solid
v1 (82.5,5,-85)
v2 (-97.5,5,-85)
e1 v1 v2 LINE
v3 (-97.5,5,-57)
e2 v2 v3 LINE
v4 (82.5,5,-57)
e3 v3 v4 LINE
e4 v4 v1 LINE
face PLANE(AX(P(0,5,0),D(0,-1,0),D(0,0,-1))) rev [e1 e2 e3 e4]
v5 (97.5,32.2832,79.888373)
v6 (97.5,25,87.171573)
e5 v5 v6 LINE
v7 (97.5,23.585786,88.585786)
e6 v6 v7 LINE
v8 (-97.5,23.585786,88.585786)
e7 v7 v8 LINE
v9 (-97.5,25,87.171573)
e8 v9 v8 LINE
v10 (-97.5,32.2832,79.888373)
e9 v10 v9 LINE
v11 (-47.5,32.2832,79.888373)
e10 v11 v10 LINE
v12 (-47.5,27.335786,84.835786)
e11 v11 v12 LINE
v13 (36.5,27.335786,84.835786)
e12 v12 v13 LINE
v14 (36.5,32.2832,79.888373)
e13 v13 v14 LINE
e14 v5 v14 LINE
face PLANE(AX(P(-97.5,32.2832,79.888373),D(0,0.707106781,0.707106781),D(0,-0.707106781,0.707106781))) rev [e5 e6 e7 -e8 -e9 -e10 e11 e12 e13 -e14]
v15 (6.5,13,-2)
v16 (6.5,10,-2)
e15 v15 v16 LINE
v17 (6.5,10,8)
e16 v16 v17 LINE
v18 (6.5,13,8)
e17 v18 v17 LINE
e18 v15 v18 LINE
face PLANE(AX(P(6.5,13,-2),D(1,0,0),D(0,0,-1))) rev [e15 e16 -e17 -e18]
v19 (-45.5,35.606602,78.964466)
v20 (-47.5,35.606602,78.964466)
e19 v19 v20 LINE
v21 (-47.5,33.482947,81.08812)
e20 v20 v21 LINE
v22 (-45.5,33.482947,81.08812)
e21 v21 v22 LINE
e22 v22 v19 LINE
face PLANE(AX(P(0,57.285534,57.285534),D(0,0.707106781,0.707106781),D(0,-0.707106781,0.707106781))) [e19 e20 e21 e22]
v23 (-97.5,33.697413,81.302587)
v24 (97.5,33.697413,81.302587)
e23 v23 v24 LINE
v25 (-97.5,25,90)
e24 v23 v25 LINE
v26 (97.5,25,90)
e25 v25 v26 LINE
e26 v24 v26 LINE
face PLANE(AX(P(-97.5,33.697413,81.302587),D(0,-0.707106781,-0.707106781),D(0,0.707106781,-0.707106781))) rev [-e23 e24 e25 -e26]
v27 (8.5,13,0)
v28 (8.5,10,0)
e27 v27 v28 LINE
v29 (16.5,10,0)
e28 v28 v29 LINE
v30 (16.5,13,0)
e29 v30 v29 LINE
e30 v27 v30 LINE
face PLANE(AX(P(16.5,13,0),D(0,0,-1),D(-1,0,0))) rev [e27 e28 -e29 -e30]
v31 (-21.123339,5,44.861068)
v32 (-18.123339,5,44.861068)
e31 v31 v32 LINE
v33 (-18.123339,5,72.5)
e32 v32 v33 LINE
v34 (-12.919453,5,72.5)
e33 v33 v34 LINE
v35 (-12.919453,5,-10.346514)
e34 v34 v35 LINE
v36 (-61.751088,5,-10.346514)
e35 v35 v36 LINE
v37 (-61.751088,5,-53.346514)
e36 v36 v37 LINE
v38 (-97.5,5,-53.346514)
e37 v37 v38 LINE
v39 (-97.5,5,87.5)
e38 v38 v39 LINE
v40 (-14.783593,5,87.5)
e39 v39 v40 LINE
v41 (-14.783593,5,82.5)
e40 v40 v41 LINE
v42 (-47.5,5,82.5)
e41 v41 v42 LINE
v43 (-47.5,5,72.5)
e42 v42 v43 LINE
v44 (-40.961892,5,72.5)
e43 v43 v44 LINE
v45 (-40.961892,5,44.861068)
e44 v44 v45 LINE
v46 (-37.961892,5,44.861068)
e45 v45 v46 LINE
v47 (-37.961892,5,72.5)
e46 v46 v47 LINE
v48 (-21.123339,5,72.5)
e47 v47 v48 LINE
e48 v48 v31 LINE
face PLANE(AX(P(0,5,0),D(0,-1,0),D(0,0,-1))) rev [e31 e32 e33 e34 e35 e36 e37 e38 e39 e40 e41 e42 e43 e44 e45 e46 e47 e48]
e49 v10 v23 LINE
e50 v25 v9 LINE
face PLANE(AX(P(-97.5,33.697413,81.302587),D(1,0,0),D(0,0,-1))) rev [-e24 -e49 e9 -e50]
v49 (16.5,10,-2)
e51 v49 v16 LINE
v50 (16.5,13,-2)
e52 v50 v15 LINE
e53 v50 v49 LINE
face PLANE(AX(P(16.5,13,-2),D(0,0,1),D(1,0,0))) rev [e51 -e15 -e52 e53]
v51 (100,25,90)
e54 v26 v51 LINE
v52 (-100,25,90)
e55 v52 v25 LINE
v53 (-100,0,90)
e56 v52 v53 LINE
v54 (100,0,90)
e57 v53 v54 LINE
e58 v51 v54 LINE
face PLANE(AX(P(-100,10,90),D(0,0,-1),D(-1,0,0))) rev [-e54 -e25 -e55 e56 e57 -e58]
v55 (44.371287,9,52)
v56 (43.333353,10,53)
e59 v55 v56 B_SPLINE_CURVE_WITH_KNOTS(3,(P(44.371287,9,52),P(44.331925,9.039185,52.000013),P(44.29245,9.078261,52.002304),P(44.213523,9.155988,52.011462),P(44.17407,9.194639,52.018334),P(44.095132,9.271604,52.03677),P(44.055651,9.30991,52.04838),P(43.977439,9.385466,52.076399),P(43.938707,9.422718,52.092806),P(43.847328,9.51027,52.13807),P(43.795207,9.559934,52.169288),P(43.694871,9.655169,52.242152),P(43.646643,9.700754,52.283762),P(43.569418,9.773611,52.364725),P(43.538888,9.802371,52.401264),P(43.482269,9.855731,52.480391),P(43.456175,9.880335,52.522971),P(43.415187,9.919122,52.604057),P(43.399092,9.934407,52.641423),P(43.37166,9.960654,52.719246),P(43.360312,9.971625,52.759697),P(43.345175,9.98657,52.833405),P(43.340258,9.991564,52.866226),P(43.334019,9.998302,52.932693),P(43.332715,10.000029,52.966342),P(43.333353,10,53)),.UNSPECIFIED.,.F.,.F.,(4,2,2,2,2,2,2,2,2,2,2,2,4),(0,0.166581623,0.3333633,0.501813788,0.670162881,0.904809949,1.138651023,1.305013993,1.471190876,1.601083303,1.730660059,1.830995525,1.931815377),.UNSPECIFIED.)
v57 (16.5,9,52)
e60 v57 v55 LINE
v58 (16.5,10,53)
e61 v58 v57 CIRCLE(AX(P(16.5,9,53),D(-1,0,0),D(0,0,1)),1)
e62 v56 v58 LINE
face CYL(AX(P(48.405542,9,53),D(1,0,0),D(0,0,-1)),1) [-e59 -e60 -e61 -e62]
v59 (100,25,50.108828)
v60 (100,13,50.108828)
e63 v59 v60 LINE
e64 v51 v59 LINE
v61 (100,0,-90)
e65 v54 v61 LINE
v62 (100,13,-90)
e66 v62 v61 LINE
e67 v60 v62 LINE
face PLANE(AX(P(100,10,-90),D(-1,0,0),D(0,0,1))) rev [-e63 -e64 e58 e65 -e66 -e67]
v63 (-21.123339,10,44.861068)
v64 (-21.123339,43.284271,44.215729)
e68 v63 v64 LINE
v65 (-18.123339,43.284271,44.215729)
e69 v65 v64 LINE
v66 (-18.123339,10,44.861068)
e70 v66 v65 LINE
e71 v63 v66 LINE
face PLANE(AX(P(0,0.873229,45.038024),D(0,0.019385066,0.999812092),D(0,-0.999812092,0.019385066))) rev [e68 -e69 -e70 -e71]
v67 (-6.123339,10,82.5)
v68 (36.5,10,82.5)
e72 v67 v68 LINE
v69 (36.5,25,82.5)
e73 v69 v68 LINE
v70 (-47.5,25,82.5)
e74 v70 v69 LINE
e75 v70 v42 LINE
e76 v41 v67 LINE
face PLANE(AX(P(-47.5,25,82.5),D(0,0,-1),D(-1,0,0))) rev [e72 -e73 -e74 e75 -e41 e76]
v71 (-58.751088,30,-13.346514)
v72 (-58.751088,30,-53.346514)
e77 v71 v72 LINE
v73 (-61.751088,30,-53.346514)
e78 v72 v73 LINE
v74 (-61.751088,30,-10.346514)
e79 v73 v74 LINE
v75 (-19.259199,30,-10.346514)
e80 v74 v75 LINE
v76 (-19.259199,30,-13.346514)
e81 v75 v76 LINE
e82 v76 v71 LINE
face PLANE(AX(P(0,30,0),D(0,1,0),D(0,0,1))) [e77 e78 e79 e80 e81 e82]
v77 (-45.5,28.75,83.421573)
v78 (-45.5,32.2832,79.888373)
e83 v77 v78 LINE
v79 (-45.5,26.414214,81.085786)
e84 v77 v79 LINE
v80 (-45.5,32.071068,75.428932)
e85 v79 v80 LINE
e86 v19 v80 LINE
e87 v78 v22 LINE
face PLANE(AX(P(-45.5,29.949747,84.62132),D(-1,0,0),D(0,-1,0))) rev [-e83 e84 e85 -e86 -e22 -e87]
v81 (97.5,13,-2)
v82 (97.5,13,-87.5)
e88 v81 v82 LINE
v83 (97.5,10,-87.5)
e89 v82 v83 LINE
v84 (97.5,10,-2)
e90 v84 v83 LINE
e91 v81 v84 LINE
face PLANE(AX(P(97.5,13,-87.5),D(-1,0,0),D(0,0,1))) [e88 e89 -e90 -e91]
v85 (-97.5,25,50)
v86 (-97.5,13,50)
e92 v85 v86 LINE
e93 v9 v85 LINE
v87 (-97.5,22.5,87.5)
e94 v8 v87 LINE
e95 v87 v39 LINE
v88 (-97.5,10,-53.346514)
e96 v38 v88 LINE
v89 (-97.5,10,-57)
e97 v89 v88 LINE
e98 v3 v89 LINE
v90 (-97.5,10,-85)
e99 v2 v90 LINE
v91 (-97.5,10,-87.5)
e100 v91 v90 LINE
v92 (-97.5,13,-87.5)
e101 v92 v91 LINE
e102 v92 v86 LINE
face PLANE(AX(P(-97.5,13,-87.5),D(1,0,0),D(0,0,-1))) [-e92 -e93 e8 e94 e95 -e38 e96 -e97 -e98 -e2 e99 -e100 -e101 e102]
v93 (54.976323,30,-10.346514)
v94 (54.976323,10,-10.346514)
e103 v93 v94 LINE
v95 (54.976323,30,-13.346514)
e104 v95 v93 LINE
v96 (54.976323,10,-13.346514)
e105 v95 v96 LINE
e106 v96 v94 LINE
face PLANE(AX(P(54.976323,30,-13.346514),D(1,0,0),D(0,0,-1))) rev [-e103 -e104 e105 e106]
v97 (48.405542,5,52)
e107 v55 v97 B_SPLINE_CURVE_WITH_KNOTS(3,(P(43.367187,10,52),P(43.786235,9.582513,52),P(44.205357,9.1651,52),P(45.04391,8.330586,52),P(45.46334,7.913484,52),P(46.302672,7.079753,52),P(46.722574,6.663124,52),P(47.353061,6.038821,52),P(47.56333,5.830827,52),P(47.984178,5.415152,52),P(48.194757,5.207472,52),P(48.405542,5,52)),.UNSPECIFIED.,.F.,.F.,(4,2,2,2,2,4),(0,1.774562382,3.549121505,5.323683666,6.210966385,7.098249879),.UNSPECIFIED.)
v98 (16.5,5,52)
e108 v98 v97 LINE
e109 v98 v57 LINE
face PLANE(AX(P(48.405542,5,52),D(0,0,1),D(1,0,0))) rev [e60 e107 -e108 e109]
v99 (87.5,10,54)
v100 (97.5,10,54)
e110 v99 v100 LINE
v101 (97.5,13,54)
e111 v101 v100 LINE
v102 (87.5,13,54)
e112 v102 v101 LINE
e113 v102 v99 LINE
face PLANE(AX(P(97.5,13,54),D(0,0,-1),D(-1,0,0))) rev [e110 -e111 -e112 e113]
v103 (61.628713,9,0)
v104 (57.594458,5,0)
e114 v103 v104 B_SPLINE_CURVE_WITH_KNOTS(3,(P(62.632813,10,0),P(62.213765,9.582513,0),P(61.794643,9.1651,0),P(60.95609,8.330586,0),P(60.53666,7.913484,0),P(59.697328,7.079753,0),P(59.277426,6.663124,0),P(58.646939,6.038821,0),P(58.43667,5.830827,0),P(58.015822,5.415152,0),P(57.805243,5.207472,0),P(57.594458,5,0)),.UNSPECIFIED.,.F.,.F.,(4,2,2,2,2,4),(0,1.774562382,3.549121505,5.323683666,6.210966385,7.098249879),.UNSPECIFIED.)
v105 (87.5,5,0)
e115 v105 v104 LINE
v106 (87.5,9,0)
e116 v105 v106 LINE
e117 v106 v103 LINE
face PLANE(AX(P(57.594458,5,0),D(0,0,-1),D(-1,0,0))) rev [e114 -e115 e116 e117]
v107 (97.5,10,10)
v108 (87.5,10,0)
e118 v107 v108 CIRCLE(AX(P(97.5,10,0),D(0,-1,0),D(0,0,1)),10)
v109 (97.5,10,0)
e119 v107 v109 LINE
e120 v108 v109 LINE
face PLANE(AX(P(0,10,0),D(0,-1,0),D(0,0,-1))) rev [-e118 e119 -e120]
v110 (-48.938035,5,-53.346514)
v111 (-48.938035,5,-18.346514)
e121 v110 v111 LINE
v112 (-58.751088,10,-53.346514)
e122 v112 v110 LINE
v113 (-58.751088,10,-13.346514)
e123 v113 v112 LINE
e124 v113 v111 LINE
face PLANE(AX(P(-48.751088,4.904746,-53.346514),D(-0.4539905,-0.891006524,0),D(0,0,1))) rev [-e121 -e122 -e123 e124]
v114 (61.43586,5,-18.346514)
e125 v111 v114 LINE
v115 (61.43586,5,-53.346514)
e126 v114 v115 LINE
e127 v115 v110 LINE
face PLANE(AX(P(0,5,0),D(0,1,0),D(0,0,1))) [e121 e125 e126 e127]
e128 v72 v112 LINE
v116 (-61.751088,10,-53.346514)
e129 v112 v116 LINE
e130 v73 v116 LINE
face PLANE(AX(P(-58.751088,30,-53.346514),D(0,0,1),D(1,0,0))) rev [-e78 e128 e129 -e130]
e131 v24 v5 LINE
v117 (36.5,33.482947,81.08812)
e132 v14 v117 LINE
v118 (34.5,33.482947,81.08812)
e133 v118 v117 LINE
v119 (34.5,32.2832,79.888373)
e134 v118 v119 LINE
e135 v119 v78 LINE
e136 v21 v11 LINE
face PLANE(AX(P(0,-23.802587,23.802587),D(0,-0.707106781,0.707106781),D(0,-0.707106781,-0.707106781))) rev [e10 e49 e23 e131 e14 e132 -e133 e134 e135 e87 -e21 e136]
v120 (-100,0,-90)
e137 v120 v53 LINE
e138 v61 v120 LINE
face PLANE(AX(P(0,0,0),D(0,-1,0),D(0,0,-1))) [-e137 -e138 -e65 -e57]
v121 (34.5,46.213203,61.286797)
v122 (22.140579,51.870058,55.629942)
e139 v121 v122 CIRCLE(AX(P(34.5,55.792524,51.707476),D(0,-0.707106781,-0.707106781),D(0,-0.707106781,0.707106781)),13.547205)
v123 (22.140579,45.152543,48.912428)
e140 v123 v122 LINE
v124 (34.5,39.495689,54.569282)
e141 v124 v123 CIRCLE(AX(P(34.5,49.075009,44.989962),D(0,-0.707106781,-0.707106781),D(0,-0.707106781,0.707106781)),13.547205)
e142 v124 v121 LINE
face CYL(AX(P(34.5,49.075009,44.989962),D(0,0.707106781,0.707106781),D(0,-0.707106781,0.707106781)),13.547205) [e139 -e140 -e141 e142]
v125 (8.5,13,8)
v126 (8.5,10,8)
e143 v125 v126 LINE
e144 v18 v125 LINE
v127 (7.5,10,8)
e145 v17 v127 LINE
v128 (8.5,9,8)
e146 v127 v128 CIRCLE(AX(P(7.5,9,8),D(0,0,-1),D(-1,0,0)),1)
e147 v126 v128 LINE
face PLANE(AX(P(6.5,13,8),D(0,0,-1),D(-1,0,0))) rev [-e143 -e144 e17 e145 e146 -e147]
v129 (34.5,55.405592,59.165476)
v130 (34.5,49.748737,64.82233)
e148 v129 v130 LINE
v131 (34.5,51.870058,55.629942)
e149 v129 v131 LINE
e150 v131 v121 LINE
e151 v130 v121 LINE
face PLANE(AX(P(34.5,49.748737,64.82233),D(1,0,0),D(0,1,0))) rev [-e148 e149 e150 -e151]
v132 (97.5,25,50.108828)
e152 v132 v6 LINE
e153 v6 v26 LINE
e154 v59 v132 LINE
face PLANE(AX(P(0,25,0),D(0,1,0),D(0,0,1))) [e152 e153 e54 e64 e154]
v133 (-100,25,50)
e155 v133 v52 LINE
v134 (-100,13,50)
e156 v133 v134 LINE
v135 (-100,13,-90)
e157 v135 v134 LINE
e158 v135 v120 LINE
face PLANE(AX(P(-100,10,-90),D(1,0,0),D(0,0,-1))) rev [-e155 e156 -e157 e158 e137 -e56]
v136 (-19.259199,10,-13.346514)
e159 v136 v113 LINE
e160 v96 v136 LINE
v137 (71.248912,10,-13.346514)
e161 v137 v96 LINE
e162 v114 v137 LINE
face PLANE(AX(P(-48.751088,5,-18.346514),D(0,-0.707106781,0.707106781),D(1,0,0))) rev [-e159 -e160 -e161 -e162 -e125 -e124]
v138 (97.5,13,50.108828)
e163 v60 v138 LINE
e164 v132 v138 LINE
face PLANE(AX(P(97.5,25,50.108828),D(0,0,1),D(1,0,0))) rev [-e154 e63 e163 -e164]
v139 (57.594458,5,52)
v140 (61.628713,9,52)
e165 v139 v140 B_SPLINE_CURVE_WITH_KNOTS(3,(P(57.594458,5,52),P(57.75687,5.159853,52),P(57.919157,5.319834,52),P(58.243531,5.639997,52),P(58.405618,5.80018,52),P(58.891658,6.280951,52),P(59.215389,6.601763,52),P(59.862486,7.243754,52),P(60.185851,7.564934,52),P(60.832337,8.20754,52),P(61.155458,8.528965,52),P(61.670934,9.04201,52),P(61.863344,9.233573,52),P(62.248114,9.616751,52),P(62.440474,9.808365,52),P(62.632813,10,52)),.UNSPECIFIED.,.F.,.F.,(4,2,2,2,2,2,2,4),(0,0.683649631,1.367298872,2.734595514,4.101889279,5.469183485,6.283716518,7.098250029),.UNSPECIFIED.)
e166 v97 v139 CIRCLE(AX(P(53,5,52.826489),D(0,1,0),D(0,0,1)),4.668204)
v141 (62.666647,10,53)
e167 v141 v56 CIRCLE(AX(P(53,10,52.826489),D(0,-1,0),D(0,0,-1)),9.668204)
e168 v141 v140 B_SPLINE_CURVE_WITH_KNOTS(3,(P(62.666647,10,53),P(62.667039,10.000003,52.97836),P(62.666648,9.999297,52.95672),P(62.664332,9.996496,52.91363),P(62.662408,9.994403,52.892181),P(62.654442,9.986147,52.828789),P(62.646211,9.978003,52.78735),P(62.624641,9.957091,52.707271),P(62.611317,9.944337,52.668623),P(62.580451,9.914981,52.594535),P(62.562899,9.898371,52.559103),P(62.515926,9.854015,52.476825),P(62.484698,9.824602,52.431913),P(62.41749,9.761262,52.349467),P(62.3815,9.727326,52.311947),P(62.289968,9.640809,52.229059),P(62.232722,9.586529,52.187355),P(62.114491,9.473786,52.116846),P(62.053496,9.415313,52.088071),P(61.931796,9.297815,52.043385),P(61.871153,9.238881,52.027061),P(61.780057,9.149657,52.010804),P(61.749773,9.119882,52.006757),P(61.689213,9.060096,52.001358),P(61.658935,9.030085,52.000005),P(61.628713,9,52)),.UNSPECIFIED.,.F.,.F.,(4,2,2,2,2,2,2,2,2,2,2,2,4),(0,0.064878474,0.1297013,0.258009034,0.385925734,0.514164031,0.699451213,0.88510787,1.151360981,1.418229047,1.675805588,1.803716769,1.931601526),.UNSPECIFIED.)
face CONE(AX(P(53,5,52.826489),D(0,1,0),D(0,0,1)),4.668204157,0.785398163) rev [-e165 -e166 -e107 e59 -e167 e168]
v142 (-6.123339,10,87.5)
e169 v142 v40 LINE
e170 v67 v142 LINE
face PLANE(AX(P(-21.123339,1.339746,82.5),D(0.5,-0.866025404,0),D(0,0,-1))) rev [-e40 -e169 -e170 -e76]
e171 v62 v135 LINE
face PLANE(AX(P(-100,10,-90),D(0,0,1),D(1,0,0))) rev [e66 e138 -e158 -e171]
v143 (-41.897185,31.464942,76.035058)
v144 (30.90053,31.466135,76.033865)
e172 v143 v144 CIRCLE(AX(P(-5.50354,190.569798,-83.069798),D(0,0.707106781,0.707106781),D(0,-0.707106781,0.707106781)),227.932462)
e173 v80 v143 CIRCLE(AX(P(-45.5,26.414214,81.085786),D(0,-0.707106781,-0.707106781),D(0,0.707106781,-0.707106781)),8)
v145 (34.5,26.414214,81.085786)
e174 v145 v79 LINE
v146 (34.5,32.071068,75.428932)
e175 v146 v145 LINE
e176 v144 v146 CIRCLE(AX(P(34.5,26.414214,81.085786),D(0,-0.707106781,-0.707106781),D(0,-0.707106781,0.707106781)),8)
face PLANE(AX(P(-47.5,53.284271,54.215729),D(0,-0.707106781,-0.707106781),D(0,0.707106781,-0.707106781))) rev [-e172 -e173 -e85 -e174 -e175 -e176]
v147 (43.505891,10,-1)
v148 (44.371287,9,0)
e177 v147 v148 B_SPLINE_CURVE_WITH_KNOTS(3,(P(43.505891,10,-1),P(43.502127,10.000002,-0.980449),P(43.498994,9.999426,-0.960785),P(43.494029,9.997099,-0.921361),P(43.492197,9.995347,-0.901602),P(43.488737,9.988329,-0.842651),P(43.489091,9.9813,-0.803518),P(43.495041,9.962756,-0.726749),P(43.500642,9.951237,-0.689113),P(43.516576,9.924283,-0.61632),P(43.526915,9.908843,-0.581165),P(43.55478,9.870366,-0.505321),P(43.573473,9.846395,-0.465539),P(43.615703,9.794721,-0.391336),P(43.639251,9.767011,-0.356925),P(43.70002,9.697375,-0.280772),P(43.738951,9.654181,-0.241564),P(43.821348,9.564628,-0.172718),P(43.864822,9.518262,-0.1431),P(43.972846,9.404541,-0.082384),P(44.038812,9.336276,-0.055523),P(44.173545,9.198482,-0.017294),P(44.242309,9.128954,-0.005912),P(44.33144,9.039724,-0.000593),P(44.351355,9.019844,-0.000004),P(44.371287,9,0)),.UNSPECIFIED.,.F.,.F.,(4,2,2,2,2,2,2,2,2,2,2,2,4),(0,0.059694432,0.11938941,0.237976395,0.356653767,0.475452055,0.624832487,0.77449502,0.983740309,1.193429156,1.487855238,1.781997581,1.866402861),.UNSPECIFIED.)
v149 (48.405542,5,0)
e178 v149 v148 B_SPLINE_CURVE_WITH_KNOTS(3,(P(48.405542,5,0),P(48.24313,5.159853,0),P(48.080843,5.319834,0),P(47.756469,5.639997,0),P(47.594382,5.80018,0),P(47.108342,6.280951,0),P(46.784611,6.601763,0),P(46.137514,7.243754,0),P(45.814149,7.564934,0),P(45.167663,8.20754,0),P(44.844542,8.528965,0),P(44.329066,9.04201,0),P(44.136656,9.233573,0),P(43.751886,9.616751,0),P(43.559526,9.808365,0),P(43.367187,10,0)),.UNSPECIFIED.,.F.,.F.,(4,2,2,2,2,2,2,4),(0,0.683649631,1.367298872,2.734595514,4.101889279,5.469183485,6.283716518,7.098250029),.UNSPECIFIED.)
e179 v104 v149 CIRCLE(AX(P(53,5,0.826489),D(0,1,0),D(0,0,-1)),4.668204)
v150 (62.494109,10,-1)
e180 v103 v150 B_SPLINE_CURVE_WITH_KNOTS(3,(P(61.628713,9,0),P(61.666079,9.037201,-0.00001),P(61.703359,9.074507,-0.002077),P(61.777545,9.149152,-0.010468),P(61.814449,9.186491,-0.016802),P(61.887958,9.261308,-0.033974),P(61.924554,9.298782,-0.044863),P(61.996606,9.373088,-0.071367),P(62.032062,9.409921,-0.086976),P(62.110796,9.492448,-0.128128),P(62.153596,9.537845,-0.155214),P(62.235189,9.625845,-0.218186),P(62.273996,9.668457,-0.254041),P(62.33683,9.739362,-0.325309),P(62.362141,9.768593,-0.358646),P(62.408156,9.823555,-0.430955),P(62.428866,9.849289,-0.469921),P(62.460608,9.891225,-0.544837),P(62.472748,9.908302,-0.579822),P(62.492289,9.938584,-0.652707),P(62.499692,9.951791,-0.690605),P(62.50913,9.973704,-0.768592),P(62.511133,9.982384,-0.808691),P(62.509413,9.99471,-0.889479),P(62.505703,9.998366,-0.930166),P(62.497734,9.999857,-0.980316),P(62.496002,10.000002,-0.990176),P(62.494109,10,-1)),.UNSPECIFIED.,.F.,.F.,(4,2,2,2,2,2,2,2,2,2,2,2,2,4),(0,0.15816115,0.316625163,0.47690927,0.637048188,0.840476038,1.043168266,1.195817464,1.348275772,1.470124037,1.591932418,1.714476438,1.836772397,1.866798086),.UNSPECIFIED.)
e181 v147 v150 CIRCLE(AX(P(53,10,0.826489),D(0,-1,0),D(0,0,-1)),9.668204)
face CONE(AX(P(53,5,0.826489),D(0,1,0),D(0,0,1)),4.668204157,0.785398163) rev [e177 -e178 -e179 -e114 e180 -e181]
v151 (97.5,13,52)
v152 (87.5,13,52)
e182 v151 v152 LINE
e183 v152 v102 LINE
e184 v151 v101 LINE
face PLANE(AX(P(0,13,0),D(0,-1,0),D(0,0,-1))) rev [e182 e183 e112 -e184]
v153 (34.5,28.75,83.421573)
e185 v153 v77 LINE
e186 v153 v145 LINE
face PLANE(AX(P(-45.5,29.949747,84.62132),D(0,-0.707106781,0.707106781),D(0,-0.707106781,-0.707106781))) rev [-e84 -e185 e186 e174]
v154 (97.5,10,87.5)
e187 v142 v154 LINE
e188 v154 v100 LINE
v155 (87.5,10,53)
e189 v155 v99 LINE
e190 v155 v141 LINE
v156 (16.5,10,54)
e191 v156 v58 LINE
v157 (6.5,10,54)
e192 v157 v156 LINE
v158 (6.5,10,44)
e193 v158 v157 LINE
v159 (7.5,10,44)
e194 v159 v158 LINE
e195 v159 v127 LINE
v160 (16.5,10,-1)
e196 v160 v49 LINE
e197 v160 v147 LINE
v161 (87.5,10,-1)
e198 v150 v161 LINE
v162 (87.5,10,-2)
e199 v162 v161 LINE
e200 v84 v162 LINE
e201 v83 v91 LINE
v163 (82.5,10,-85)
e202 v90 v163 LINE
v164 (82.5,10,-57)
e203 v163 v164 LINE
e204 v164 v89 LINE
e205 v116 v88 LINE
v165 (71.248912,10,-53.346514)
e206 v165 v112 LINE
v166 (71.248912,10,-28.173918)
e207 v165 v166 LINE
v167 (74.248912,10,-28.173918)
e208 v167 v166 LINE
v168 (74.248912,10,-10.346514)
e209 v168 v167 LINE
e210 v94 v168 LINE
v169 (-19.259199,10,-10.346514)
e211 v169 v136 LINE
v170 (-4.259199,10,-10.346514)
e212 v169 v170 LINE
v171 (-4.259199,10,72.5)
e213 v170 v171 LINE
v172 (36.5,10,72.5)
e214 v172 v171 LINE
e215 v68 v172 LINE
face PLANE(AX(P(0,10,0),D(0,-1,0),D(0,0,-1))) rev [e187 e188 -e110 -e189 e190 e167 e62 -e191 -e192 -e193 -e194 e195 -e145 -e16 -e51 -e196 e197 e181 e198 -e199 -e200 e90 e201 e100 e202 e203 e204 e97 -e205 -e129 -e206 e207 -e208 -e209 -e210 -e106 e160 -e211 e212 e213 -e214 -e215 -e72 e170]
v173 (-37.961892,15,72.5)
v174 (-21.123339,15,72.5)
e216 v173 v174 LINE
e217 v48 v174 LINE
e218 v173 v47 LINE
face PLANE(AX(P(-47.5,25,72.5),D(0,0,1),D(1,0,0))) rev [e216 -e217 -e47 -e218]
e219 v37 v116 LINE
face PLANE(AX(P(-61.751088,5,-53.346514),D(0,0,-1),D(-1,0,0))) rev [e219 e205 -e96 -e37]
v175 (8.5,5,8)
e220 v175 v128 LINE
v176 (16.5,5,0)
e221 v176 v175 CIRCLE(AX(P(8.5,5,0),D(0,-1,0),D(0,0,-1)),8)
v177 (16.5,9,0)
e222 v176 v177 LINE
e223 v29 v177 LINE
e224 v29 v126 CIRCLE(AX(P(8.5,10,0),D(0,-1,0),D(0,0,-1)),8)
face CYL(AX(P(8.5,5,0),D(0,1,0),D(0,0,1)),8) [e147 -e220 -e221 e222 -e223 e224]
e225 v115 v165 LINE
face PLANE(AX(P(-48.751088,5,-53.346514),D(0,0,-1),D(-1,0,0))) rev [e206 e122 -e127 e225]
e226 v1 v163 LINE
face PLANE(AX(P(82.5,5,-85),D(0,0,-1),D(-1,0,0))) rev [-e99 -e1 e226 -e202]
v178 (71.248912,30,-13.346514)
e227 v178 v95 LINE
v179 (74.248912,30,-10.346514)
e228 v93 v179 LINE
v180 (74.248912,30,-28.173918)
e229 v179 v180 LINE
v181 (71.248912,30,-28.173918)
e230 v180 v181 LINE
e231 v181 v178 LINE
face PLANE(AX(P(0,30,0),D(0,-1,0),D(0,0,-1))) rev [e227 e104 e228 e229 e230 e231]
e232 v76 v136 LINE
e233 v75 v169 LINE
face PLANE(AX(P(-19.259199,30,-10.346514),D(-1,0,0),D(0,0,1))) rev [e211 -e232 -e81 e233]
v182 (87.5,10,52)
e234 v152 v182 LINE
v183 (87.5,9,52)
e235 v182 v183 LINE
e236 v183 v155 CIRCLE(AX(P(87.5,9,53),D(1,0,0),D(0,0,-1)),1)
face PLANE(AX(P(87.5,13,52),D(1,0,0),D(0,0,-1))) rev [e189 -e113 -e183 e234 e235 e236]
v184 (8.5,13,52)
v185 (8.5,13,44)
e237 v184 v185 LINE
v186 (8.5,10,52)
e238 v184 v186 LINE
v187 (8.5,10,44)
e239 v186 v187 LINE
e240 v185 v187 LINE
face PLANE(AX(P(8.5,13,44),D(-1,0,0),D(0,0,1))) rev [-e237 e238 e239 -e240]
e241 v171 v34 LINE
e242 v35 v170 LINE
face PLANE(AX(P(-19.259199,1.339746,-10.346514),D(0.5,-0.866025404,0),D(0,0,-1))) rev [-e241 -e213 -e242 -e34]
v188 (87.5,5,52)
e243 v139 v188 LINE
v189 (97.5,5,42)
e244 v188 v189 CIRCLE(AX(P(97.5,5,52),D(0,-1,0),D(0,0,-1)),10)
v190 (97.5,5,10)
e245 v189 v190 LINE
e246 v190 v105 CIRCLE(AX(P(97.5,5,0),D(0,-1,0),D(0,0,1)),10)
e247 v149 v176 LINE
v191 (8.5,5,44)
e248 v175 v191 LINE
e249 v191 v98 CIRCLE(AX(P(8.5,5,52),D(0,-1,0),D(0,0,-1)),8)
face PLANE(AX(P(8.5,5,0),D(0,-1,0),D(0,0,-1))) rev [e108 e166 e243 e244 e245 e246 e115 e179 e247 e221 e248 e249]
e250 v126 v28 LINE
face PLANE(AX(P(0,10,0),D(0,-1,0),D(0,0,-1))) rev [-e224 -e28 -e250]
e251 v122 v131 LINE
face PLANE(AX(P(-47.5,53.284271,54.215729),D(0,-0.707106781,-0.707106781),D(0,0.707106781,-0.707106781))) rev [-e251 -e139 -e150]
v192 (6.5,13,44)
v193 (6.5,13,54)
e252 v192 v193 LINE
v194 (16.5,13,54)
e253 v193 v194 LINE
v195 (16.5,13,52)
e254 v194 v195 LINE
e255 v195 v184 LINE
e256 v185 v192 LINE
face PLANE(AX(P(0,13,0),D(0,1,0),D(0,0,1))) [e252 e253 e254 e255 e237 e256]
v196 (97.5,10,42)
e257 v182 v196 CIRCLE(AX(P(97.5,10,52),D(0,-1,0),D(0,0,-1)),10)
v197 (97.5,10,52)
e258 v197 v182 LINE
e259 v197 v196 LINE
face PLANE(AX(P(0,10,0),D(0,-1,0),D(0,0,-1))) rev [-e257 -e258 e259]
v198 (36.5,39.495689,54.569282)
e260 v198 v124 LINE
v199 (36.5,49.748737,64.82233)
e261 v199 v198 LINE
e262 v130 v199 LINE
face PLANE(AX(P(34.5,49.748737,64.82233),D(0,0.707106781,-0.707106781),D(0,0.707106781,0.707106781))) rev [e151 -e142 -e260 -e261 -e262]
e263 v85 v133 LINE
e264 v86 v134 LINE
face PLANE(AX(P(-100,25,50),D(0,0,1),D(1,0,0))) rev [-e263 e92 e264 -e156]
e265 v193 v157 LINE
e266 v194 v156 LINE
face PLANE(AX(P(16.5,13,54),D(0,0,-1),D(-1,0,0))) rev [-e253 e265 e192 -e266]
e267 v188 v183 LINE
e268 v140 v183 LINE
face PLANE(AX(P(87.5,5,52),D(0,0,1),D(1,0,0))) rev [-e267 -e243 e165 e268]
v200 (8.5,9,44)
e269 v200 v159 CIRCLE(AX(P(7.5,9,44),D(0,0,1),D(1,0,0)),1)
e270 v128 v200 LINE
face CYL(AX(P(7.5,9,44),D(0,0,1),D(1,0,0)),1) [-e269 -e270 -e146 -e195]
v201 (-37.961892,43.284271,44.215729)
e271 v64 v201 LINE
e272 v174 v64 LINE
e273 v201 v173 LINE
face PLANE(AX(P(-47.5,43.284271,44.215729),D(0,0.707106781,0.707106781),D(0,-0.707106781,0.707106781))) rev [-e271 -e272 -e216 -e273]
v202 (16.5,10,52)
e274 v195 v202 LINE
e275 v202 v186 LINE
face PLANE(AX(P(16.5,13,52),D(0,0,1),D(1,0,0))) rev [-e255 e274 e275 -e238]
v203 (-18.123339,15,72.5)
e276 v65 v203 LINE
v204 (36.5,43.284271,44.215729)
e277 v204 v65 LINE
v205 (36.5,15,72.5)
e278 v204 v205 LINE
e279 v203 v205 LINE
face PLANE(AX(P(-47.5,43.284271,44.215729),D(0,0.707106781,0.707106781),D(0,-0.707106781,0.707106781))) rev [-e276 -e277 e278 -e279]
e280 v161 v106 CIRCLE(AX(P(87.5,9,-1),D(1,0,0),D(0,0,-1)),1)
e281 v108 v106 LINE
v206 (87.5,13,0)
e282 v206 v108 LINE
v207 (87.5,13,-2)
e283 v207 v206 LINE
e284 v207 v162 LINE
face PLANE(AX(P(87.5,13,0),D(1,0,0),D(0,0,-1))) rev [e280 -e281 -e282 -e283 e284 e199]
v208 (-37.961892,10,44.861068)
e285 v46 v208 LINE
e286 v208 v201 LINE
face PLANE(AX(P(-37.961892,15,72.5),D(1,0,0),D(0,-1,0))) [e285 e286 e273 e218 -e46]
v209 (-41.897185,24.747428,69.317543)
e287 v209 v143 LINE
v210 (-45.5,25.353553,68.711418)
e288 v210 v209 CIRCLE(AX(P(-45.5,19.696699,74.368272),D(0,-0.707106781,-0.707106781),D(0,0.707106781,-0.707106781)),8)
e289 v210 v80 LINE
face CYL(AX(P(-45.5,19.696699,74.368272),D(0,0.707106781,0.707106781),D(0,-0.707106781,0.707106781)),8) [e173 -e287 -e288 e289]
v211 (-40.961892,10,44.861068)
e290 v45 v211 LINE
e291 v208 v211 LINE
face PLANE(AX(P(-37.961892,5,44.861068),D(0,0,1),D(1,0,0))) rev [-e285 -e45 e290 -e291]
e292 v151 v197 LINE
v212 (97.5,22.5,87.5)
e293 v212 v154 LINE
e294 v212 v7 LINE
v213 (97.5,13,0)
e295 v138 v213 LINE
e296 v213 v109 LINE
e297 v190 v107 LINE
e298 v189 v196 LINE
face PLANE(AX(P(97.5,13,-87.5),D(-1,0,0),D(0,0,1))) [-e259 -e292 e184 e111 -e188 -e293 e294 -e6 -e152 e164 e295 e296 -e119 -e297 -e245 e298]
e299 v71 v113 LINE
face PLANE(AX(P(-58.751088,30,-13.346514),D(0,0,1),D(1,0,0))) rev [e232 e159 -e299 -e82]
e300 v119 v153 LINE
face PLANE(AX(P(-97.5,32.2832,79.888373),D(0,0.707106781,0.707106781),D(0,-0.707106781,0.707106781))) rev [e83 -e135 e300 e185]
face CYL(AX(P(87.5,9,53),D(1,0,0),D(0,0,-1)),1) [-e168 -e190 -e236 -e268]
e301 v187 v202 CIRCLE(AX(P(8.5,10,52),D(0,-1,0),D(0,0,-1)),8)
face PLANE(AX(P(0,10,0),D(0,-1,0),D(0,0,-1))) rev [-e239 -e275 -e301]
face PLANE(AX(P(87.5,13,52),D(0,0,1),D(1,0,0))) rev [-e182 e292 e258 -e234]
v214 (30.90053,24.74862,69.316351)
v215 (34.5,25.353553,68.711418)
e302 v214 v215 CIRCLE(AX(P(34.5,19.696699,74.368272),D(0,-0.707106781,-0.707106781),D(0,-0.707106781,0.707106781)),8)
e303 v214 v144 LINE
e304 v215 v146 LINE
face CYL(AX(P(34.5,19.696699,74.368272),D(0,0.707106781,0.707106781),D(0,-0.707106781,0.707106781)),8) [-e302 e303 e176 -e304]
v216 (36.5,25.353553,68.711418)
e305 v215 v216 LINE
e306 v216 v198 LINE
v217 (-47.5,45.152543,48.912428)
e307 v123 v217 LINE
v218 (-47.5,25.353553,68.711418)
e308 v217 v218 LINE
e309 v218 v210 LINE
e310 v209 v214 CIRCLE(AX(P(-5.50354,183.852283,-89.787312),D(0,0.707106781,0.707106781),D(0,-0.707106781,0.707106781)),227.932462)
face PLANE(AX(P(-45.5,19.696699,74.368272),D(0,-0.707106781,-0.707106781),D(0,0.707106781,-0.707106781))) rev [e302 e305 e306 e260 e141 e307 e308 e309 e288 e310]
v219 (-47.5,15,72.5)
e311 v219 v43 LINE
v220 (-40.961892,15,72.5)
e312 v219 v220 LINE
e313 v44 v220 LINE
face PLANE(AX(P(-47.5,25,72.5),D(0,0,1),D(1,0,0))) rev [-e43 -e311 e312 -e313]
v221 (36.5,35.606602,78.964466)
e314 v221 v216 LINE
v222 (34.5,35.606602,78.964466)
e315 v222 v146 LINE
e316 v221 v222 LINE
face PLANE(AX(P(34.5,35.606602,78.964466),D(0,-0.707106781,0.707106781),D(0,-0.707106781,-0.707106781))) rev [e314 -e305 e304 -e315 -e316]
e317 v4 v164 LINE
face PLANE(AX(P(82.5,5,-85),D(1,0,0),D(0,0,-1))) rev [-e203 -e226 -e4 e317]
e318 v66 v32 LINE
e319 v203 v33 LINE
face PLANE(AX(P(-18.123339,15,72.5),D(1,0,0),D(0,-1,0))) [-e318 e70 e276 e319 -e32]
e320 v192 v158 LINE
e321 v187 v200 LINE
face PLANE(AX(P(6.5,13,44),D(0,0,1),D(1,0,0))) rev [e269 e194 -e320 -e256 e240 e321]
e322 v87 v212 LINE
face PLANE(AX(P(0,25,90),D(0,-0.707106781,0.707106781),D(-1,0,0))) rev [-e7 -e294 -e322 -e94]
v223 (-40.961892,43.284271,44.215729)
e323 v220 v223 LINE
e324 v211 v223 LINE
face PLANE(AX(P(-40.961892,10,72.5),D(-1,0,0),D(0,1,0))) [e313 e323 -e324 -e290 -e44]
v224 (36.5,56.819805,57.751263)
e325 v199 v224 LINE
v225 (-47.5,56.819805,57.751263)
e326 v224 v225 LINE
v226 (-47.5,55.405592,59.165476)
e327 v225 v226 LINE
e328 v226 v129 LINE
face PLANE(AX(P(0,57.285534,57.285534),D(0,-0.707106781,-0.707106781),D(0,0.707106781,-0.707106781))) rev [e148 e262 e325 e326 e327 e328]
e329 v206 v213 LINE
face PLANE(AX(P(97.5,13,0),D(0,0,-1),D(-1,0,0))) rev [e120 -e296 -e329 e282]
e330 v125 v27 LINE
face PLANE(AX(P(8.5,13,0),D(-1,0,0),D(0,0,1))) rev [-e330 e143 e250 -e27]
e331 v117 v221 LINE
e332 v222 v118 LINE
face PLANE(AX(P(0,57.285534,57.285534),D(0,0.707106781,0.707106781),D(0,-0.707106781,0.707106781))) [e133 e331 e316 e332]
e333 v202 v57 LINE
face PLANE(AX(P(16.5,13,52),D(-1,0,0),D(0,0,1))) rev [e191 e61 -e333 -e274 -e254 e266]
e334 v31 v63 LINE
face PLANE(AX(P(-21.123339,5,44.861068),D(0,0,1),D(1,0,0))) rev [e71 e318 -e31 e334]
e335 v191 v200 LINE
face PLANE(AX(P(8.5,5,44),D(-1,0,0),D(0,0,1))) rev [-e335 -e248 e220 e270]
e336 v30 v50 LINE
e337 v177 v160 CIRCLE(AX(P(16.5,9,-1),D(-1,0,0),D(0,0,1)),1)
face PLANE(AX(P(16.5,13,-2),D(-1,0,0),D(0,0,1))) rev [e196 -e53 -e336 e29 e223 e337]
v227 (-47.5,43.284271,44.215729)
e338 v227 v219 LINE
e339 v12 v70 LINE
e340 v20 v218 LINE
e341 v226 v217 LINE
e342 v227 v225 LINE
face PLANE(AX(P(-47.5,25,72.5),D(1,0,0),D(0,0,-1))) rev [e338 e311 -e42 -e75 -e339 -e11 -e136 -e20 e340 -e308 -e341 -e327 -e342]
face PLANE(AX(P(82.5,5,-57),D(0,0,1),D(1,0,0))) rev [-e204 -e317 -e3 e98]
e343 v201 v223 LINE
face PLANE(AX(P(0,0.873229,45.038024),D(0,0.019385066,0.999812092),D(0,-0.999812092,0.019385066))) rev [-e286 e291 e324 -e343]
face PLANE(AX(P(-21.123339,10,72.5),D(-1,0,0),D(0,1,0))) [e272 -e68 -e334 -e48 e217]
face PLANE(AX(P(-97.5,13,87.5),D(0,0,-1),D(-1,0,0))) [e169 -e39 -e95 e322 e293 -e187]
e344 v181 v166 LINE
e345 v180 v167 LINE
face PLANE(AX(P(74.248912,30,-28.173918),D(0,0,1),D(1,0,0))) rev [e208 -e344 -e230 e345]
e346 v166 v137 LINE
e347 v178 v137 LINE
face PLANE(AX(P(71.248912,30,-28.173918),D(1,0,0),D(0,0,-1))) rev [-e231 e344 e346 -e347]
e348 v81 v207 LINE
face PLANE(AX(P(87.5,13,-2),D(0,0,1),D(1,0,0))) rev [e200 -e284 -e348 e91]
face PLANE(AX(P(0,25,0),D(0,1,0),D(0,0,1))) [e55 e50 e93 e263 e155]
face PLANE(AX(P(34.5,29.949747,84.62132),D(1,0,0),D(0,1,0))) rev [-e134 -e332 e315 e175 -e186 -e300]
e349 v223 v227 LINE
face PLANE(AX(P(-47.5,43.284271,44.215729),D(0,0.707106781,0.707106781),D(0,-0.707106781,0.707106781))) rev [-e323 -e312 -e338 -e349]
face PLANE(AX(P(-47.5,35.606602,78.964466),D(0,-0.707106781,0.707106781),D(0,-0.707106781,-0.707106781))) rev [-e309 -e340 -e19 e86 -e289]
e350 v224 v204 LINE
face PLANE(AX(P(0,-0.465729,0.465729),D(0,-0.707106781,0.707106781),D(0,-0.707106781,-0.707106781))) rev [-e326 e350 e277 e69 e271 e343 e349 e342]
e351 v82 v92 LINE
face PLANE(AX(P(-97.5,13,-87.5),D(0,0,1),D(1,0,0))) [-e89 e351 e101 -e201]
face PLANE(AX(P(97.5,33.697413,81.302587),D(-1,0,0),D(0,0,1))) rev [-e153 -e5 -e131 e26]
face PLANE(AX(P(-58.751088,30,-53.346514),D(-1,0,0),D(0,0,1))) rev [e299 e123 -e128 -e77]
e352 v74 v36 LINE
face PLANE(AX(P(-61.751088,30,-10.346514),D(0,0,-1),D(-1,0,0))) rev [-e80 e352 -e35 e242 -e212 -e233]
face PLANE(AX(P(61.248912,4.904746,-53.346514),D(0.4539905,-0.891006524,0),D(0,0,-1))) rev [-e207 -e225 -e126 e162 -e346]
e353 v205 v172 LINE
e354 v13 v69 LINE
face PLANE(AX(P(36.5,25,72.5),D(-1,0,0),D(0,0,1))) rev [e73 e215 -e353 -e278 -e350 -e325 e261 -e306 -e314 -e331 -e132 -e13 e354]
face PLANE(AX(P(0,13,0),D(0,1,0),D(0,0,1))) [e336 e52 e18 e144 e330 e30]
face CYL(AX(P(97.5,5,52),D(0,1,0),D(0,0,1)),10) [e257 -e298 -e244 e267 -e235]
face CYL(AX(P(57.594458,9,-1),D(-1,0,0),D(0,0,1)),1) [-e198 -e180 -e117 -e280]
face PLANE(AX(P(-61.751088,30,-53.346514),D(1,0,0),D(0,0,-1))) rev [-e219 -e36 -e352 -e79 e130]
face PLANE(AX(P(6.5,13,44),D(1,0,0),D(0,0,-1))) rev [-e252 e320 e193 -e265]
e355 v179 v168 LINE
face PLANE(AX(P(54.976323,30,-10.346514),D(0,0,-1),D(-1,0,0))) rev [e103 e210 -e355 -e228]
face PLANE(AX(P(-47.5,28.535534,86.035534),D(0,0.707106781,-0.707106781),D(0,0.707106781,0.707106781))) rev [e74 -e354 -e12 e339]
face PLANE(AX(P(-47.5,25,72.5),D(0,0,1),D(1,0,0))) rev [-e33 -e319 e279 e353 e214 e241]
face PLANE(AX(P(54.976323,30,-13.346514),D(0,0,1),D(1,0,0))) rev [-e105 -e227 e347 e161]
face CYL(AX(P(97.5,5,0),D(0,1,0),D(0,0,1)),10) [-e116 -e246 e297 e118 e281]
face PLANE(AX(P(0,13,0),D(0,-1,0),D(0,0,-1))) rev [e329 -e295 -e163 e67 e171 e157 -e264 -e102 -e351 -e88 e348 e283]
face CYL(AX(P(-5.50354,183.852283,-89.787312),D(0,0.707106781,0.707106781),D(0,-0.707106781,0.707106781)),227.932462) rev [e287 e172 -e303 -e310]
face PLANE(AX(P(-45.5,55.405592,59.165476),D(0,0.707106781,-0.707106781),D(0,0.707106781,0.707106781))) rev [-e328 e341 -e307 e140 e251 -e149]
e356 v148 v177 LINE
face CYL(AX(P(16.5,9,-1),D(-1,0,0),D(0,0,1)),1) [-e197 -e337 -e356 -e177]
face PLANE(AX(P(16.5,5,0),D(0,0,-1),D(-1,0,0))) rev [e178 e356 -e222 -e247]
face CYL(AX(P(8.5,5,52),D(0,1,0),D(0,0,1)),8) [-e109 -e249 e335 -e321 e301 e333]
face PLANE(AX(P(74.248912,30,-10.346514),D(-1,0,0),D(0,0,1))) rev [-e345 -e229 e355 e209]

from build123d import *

# Parameters (mm, degrees)
SKETCH1_W            = 200
SKETCH1_H            = 180
BOSS_EXTRUDE1_DEPTH  = 10
SKETCH2_W            = 200
SKETCH2_H            = 180
SKETCH2_W_2          = 195
SKETCH2_H_2          = 175
BOSS_EXTRUDE2_DEPTH  = 3
SKETCH11_W           = 180
SKETCH11_H           = 28
CUT_EXTRUDE4_DEPTH   = 8
BOSS_EXTRUDE6_DEPTH  = 20
SKETCH4_W            = 10
SKETCH4_H            = 2
BOSS_EXTRUDE3_DEPTH  = 3
CUT_EXTRUDE1_DEPTH   = 5
CHAMFER1_SIZE        = 5
FILLET1_R            = 1
SKETCH7_W            = 84
SKETCH7_H            = 10
BOSS_EXTRUDE4_DEPTH  = 15
CHAMFER2_SIZE        = 10
SKETCH8_W            = 84
SKETCH8_H            = 14.142135624
BOSS_EXTRUDE5_DEPTH  = 40
BOSS_EXTRUDE12_DEPTH = 5
CUT_EXTRUDE5_DEPTH   = 9.5
LOFT2_START          = -40.961892057
LOFT2_DEPTH          = 3
LOFT3_START          = 61.722133944
LOFT3_OUTLINE_W      = 3
LOFT3_OUTLINE_H      = 43.678858874
LOFT3_DEPTH          = 4.277866056
LOFT5_START          = -40.961892057
LOFT5_DEPTH          = 3
LOFT6_START          = -21.123339187
LOFT6_DEPTH          = 3
SKETCH32_W           = 110
SKETCH32_H           = 35
CUT_EXTRUDE6_DEPTH   = 5
CHAMFER6_START       = -10.346513917
CHAMFER6_DEPTH       = 82.846513917
CHAMFER6_2_OUTLINE_W = 1.135860263
CHAMFER6_2_OUTLINE_H = 5
CHAMFER6_2_DEPTH     = 55.207581741
CHAMFER6_START_2     = 82.5
CHAMFER6_3_DEPTH     = 5
CHAMFER8_SIZE        = 5
BOSS_EXTRUDE13_DEPTH = 12
CHAMFER5_SIZE        = 2.5
SKETCH25_W           = 195
SKETCH25_H           = 2
BOSS_EXTRUDE14_DEPTH = 12.3
BOSS_EXTRUDE15_DEPTH = 10


with BuildPart() as part:
    # Sketch1 → Boss-Extrude1 (new body)
    with BuildSketch(Plane(origin=(0, 0, 0), x_dir=(1, 0, 0), z_dir=(0, 1, 0))):
        Rectangle(SKETCH1_W, SKETCH1_H)
    extrude(amount=BOSS_EXTRUDE1_DEPTH)

    # Sketch2 → Boss-Extrude2 (add)
    with BuildSketch(Plane(origin=(0, 10, 0), x_dir=(1, 0, 0), z_dir=(0, 1, 0))):
        Rectangle(SKETCH2_W, SKETCH2_H)
        Rectangle(SKETCH2_W_2, SKETCH2_H_2, mode=Mode.SUBTRACT)
    extrude(amount=BOSS_EXTRUDE2_DEPTH)

    # Sketch11 → Cut-Extrude4 (cut)
    with BuildSketch(Plane(origin=(0, 13, 0), x_dir=(1, 0, 0), z_dir=(0, 1, 0))):
        with Locations((-7.5, 71)):
            Rectangle(SKETCH11_W, SKETCH11_H)
    extrude(amount=-CUT_EXTRUDE4_DEPTH, mode=Mode.SUBTRACT)

    # Sketch12 → Boss-Extrude6 (add)
    with BuildSketch(Plane(origin=(0, 10, 0), x_dir=(1, 0, 0), z_dir=(0, 1, 0))):
        Polygon((-58.75108786, 53.346513917), (-58.75108786, 13.346513917), (-19.25919945, 13.346513917), (-19.25919945, 10.346513917), (-61.75108786, 10.346513917), (-61.75108786, 53.346513917), align=None)
        Polygon((71.24891214, 28.173917959), (71.24891214, 13.346513917), (54.976322897, 13.346513917), (54.976322897, 10.346513917), (74.24891214, 10.346513917), (74.24891214, 28.173917959), align=None)
    extrude(amount=BOSS_EXTRUDE6_DEPTH)

    # Sketch4 → Boss-Extrude3 (add)
    with BuildSketch(Plane(origin=(0, 10, 0), x_dir=(1, 0, 0), z_dir=(0, 1, 0))):
        Polygon((8.5, 0), (8.5, -8), (6.5, -8), (6.5, 2), (16.5, 2), (16.5, 0), align=None)
        Polygon((16.5, -52), (16.5, -54), (6.5, -54), (6.5, -44), (8.5, -44), (8.5, -52), align=None)
        with Locations((92.5, 1)):
            Rectangle(SKETCH4_W, SKETCH4_H)
        with Locations((92.5, -53)):
            Rectangle(SKETCH4_W, SKETCH4_H)
    extrude(amount=BOSS_EXTRUDE3_DEPTH)

    # Sketch5 → Cut-Extrude1 (cut)
    with BuildSketch(Plane(origin=(0, 10, 0), x_dir=(1, 0, 0), z_dir=(0, 1, 0))):
        with BuildLine():
            Line((16.5, 0), (48.405541733, 0))
            ThreePointArc((48.405541733, 0), (53, 3.841715626), (57.594458267, 0))
            Line((57.594458267, 0), (87.5, 0))
            ThreePointArc((87.5, 0), (90.428932188, -7.071067812), (97.5, -10))
            Line((97.5, -10), (97.5, -42))
            ThreePointArc((97.5, -42), (90.428932188, -44.928932188), (87.5, -52))
            Line((87.5, -52), (57.594458267, -52))
            ThreePointArc((57.594458267, -52), (53, -57.494692689), (48.405541733, -52))
            Line((48.405541733, -52), (16.5, -52))
            ThreePointArc((16.5, -52), (14.156854249, -46.343145751), (8.5, -44))
            Line((8.5, -44), (8.5, -8))
            ThreePointArc((8.5, -8), (14.156854249, -5.656854249), (16.5, 0))
        make_face()
    extrude(amount=-CUT_EXTRUDE1_DEPTH, mode=Mode.SUBTRACT)

    # Chamfer1
    chamfer1_edges = [part.edges().sort_by_distance(p)[0] for p in [
        (53, 10, -3.841715626),
        (53, 10, 57.494692689),
    ]]
    chamfer(chamfer1_edges, length=CHAMFER1_SIZE - 0.0001)  # a hair under: the kernel refuses the full size

    # Fillet1
    # the kernel refuses this fillet: 1 mm, written as the material it takes off along each edge
    with BuildSketch(Plane(origin=(8.5, 10, 44), x_dir=(-1, 0, 0), z_dir=(0, 0, -1))) as fillet1_piece_1:
        with BuildLine():
            CenterArc((FILLET1_R, -FILLET1_R), FILLET1_R, 90, 90)
            Line((0, -FILLET1_R), (0, 0))
            Line((0, 0), (FILLET1_R, 0))
        make_face()
    extrude(amount=36, mode=Mode.SUBTRACT)
    with BuildSketch(Plane(origin=(45.867287261, 10, 52), x_dir=(0, 0, 1), z_dir=(-1, 0, 0)), Plane(origin=(16.5, 10, 0), x_dir=(0, 0, -1), z_dir=(1, 0, 0))) as fillet1_piece_2:
        with BuildLine():
            CenterArc((FILLET1_R, -FILLET1_R), FILLET1_R, 90, 90)
            Line((0, -FILLET1_R), (0, 0))
            Line((0, 0), (FILLET1_R, 0))
        make_face()
    extrude(amount=29.367287261, mode=Mode.SUBTRACT)
    with BuildSketch(Plane(origin=(87.5, 10, 52), x_dir=(0, 0, 1), z_dir=(-1, 0, 0)), Plane(origin=(60.132712739, 10, 0), x_dir=(0, 0, -1), z_dir=(1, 0, 0))) as fillet1_piece_3:
        with BuildLine():
            CenterArc((FILLET1_R, -FILLET1_R), FILLET1_R, 90, 90)
            Line((0, -FILLET1_R), (0, 0))
            Line((0, 0), (FILLET1_R, 0))
        make_face()
    extrude(amount=27.367287261, mode=Mode.SUBTRACT)

    # Sketch7 → Boss-Extrude4 (add)
    with BuildSketch(Plane(origin=(0, 10, 0), x_dir=(1, 0, 0), z_dir=(0, 1, 0))):
        with Locations((-5.5, -77.5)):
            Rectangle(SKETCH7_W, SKETCH7_H)
    extrude(amount=BOSS_EXTRUDE4_DEPTH)

    # Chamfer2
    chamfer2_edges = [part.edges().sort_by_distance(p)[0] for p in [
        (-5.5, 25, 72.5),
    ]]
    chamfer(chamfer2_edges, length=CHAMFER2_SIZE - 0.0001)  # a hair under: the kernel refuses the full size

    # Sketch8 → Boss-Extrude5 (add)
    with BuildSketch(Plane(origin=(0, -28.75, 28.75), x_dir=(1, 0, 0), z_dir=(0, 0.7071067811865446, -0.7071067811865506))):
        with Locations((-5.5, -68.942911166)):
            Rectangle(SKETCH8_W, SKETCH8_H)
    extrude(amount=BOSS_EXTRUDE5_DEPTH)

    # Sketch22 → Boss-Extrude12 (add)
    with BuildSketch(Plane(origin=(0, 53.75, 53.75), x_dir=(1, 0, 0), z_dir=(0, 0.7071067811865507, 0.7071067811865446))):
        Polygon((-47.5, -0.658639918), (-47.5, -2.658639918), (-45.5, -2.658639918), (34.5, -2.658639918), (34.5, -10.658639918), (36.5, -10.658639918), (36.5, -0.658639918), align=None)
        Polygon((-47.5, -40.658639918), (36.5, -40.658639918), (36.5, -30.658639918), (34.5, -30.658639918), (34.5, -38.658639918), (-45.5, -38.658639918), (-45.5, -30.658639918), (-47.5, -30.658639918), align=None)
    extrude(amount=BOSS_EXTRUDE12_DEPTH)

    # Sketch23 → Cut-Extrude5 (cut)
    with BuildSketch(Plane(origin=(0, 53.75, 53.75), x_dir=(1, 0, 0), z_dir=(0, 0.7071067811865507, 0.7071067811865446))):
        with BuildLine():
            Line((-47.5, -2.658639918), (14.408313461, -2.658639918))
            Line((14.408313461, -2.658639918), (22.14057939, -2.658639918))
            ThreePointArc((22.14057939, -2.658639918), (27.138694447, -8.484119002), (34.5, -10.658639918))
            Line((34.5, -10.658639918), (36.5, -10.658639918))
            Line((36.5, -10.658639918), (36.5, -30.658639918))
            Line((36.5, -30.658639918), (34.5, -30.658639918))
            ThreePointArc((34.5, -30.658639918), (32.65013037, -30.875454044), (30.900530206, -31.514144331))
            ThreePointArc((30.900530206, -31.514144331), (-5.498259382, -34.440048812), (-41.897184507, -31.515830911))
            ThreePointArc((-41.897184507, -31.515830911), (-43.648307809, -30.875887447), (-45.5, -30.658639918))
            Line((-45.5, -30.658639918), (-47.5, -30.658639918))
            Line((-47.5, -30.658639918), (-47.5, -2.658639918))
        make_face()
    extrude(amount=-CUT_EXTRUDE5_DEPTH, mode=Mode.SUBTRACT)

    # Loft2: read off the stored shape, not the designer's step
    # Loft2 outline → Loft2 (add)
    with BuildSketch(Plane.YZ.offset(LOFT2_START)):
        Polygon((10, 72.5), (43.284271247, 44.215728753), (15, 72.5), align=None)
    extrude(amount=LOFT2_DEPTH)

    # Loft3: read off the stored shape, not the designer's step
    # Loft3 outline → Loft3 (add)
    with BuildSketch(Plane(origin=(0, 0, 0), x_dir=(1, 0, 0), z_dir=(0, 0.6475505994673441, 0.7620224544785301)).offset(LOFT3_START)):
        with Locations((-19.623339187, -17.48776448)):
            Rectangle(LOFT3_OUTLINE_W, LOFT3_OUTLINE_H)
    extrude(amount=LOFT3_DEPTH)

    # Loft5: read off the stored shape, not the designer's step
    # Loft5 outline → Loft5 (add)
    with BuildSketch(Plane.YZ.offset(LOFT5_START)):
        Polygon((10, 44.861067824), (43.284271247, 44.215728753), (10, 72.5), align=None)
    extrude(amount=LOFT5_DEPTH)

    # Loft6: read off the stored shape, not the designer's step
    # Loft6 outline → Loft6 (add)
    with BuildSketch(Plane.YZ.offset(LOFT6_START)):
        Polygon((10, 44.861067824), (43.284271247, 44.215728753), (10, 72.5), align=None)
    extrude(amount=LOFT6_DEPTH)

    # Sketch32 → Cut-Extrude6 (cut)
    with BuildSketch(Plane(origin=(0, 10, 0), x_dir=(1, 0, 0), z_dir=(0, 1, 0))):
        Polygon((-97.5, -87.5), (-97.5, 53.346513917), (-61.75108786, 53.346513917), (-61.75108786, 10.346513917), (-19.25919945, 10.346513917), (-19.25919945, -44.861067824), (-21.123339187, -44.861067824), (-21.123339187, -72.5), (-37.961892057, -72.5), (-37.961892057, -44.861067824), (-40.961892057, -44.861067824), (-40.961892057, -72.5), (-47.5, -72.5), (-47.5, -82.5), (-21.123339187, -82.5), (-21.123339187, -87.5), align=None)
        with Locations((6.24891214, 35.846513917)):
            Rectangle(SKETCH32_W, SKETCH32_H)
    extrude(amount=-CUT_EXTRUDE6_DEPTH, mode=Mode.SUBTRACT)

    # Chamfer6: read off the stored shape, not the designer's step
    # Chamfer6 outline → Chamfer6 (cut)
    with BuildSketch(Plane.XY.offset(CHAMFER6_START)):
        Polygon((-18.123339187, 10), (-18.123339187, 5), (-12.919453488, 5), (-4.25919945, 10), align=None)
    extrude(amount=CHAMFER6_DEPTH, mode=Mode.SUBTRACT)

    # Chamfer6 2 outline → Chamfer6 2 (cut)
    with BuildSketch(Plane.XY.offset(CHAMFER6_START)):
        with Locations((-18.691269319, 7.5)):
            Rectangle(CHAMFER6_2_OUTLINE_W, CHAMFER6_2_OUTLINE_H)
    extrude(amount=CHAMFER6_2_DEPTH, mode=Mode.SUBTRACT)

    # Chamfer6 3 outline → Chamfer6 3 (cut)
    with BuildSketch(Plane.XY.offset(CHAMFER6_START_2)):
        Polygon((-14.783593225, 5), (-6.123339187, 10), (-21.123339187, 10), (-21.123339187, 5), align=None)
    extrude(amount=CHAMFER6_3_DEPTH, mode=Mode.SUBTRACT)

    # Chamfer7
    # the kernel refuses this chamfer: 10, 5.095254495 mm, written as the material it takes off along each edge
    with BuildSketch(Plane(origin=(-48.75108786, 10, -18.346513917), x_dir=(-1, 0, 0), z_dir=(0, 0, -1))) as chamfer7_piece_1_section:
        with BuildLine():
            Line((10.35640261, 0.1815962), (-0.35640261, -5.276850695))
            Line((-0.35640261, -5.276850695), (-0.55640261, -5.276850695))
            ThreePointArc((-0.55640261, -5.276850695), (-0.2, -2.638425347), (-0.2, 0))
            Line((-0.2, 0), (0, 0.2))
            ThreePointArc((0, 0.2), (5.178201305, 0.2), (10.35640261, 0.3815962))
            Line((10.35640261, 0.3815962), (10.35640261, 0.1815962))
        make_face()
    chamfer7_piece_1 = extrude(amount=35, mode=Mode.PRIVATE)
    chamfer7_piece_1 = split(chamfer7_piece_1, bisect_by=Plane(origin=(-58.75108786, 10, -18.346513917), z_dir=(1, 0, 0)), keep=Keep.TOP, mode=Mode.PRIVATE)
    chamfer7_piece_1 = split(chamfer7_piece_1, bisect_by=Plane(origin=(-48.75108786, 5, -18.346513917), z_dir=(0, 1, 0)), keep=Keep.TOP, mode=Mode.PRIVATE)
    add(chamfer7_piece_1, mode=Mode.SUBTRACT)
    with BuildSketch(Plane(origin=(61.24891214, 10, -53.346513917), x_dir=(1, 0, 0), z_dir=(0, 0, 1))) as chamfer7_piece_2_section:
        with BuildLine():
            Line((10.35640261, 0.1815962), (-0.35640261, -5.276850695))
            Line((-0.35640261, -5.276850695), (-0.55640261, -5.276850695))
            ThreePointArc((-0.55640261, -5.276850695), (-0.2, -2.638425347), (-0.2, 0))
            Line((-0.2, 0), (0, 0.2))
            ThreePointArc((0, 0.2), (5.178201305, 0.2), (10.35640261, 0.3815962))
            Line((10.35640261, 0.3815962), (10.35640261, 0.1815962))
        make_face()
    chamfer7_piece_2 = extrude(amount=35, mode=Mode.PRIVATE)
    chamfer7_piece_2 = split(chamfer7_piece_2, bisect_by=Plane(origin=(71.24891214, 10, -53.346513917), z_dir=(-1, 0, 0)), keep=Keep.TOP, mode=Mode.PRIVATE)
    chamfer7_piece_2 = split(chamfer7_piece_2, bisect_by=Plane(origin=(61.24891214, 5, -53.346513917), z_dir=(0, 1, 0)), keep=Keep.TOP, mode=Mode.PRIVATE)
    add(chamfer7_piece_2, mode=Mode.SUBTRACT)

    # Chamfer8
    chamfer8_edges = [part.edges().sort_by_distance(p)[0] for p in [
        (6.24891214, 10, -18.346513917),
    ]]
    chamfer(chamfer8_edges, length=CHAMFER8_SIZE - 0.0001)  # a hair under: the kernel refuses the full size

    # Sketch24 → Boss-Extrude13 (add)
    with BuildSketch(Plane(origin=(0, 13, 0), x_dir=(1, 0, 0), z_dir=(0, 1, 0))):
        Polygon((-100, -90), (100, -90), (100, -50.108827803), (97.5, -50.108827803), (97.5, -87.5), (-97.5, -87.5), (-97.5, -50), (-100, -50), align=None)
    extrude(amount=BOSS_EXTRUDE13_DEPTH)

    # Chamfer5
    chamfer5_edges = [part.edges().sort_by_distance(p)[0] for p in [
        (0, 25, 87.5),
    ]]
    chamfer(chamfer5_edges, length=CHAMFER5_SIZE - 0.0001)  # a hair under: the kernel refuses the full size

    # Sketch25 → Boss-Extrude14 (add)
    with BuildSketch(Plane(origin=(0, -32.5, 32.5), x_dir=(1, 0, 0), z_dir=(0, 0.7071067811865408, -0.7071067811865543))):
        with Locations((0, -80.317279836)):
            Rectangle(SKETCH25_W, SKETCH25_H)
    extrude(amount=BOSS_EXTRUDE14_DEPTH)

    # Sketch26 → Boss-Extrude15 (add)
    with BuildSketch(Plane(origin=(0, -23.802586591, 23.802586591), x_dir=(1, 0, 0), z_dir=(0, 0.7071067811865441, -0.707106781186551))):
        Polygon((-97.5, -79.317279836), (-97.5, -81.317279836), (-47.5, -81.317279836), (-45.50354013, -81.317279836), (-41.00354013, -81.317279836), (-41.00354013, -79.317279836), (-45.5, -79.317279836), (-47.5, -79.317279836), align=None)
        Polygon((97.5, -79.317279836), (97.5, -81.317279836), (36.492919741, -81.317279836), (30, -81.317279836), (30, -79.317279836), (34.5, -79.317279836), (36.5, -79.317279836), align=None)
    extrude(amount=-BOSS_EXTRUDE15_DEPTH)


solid = part.part
